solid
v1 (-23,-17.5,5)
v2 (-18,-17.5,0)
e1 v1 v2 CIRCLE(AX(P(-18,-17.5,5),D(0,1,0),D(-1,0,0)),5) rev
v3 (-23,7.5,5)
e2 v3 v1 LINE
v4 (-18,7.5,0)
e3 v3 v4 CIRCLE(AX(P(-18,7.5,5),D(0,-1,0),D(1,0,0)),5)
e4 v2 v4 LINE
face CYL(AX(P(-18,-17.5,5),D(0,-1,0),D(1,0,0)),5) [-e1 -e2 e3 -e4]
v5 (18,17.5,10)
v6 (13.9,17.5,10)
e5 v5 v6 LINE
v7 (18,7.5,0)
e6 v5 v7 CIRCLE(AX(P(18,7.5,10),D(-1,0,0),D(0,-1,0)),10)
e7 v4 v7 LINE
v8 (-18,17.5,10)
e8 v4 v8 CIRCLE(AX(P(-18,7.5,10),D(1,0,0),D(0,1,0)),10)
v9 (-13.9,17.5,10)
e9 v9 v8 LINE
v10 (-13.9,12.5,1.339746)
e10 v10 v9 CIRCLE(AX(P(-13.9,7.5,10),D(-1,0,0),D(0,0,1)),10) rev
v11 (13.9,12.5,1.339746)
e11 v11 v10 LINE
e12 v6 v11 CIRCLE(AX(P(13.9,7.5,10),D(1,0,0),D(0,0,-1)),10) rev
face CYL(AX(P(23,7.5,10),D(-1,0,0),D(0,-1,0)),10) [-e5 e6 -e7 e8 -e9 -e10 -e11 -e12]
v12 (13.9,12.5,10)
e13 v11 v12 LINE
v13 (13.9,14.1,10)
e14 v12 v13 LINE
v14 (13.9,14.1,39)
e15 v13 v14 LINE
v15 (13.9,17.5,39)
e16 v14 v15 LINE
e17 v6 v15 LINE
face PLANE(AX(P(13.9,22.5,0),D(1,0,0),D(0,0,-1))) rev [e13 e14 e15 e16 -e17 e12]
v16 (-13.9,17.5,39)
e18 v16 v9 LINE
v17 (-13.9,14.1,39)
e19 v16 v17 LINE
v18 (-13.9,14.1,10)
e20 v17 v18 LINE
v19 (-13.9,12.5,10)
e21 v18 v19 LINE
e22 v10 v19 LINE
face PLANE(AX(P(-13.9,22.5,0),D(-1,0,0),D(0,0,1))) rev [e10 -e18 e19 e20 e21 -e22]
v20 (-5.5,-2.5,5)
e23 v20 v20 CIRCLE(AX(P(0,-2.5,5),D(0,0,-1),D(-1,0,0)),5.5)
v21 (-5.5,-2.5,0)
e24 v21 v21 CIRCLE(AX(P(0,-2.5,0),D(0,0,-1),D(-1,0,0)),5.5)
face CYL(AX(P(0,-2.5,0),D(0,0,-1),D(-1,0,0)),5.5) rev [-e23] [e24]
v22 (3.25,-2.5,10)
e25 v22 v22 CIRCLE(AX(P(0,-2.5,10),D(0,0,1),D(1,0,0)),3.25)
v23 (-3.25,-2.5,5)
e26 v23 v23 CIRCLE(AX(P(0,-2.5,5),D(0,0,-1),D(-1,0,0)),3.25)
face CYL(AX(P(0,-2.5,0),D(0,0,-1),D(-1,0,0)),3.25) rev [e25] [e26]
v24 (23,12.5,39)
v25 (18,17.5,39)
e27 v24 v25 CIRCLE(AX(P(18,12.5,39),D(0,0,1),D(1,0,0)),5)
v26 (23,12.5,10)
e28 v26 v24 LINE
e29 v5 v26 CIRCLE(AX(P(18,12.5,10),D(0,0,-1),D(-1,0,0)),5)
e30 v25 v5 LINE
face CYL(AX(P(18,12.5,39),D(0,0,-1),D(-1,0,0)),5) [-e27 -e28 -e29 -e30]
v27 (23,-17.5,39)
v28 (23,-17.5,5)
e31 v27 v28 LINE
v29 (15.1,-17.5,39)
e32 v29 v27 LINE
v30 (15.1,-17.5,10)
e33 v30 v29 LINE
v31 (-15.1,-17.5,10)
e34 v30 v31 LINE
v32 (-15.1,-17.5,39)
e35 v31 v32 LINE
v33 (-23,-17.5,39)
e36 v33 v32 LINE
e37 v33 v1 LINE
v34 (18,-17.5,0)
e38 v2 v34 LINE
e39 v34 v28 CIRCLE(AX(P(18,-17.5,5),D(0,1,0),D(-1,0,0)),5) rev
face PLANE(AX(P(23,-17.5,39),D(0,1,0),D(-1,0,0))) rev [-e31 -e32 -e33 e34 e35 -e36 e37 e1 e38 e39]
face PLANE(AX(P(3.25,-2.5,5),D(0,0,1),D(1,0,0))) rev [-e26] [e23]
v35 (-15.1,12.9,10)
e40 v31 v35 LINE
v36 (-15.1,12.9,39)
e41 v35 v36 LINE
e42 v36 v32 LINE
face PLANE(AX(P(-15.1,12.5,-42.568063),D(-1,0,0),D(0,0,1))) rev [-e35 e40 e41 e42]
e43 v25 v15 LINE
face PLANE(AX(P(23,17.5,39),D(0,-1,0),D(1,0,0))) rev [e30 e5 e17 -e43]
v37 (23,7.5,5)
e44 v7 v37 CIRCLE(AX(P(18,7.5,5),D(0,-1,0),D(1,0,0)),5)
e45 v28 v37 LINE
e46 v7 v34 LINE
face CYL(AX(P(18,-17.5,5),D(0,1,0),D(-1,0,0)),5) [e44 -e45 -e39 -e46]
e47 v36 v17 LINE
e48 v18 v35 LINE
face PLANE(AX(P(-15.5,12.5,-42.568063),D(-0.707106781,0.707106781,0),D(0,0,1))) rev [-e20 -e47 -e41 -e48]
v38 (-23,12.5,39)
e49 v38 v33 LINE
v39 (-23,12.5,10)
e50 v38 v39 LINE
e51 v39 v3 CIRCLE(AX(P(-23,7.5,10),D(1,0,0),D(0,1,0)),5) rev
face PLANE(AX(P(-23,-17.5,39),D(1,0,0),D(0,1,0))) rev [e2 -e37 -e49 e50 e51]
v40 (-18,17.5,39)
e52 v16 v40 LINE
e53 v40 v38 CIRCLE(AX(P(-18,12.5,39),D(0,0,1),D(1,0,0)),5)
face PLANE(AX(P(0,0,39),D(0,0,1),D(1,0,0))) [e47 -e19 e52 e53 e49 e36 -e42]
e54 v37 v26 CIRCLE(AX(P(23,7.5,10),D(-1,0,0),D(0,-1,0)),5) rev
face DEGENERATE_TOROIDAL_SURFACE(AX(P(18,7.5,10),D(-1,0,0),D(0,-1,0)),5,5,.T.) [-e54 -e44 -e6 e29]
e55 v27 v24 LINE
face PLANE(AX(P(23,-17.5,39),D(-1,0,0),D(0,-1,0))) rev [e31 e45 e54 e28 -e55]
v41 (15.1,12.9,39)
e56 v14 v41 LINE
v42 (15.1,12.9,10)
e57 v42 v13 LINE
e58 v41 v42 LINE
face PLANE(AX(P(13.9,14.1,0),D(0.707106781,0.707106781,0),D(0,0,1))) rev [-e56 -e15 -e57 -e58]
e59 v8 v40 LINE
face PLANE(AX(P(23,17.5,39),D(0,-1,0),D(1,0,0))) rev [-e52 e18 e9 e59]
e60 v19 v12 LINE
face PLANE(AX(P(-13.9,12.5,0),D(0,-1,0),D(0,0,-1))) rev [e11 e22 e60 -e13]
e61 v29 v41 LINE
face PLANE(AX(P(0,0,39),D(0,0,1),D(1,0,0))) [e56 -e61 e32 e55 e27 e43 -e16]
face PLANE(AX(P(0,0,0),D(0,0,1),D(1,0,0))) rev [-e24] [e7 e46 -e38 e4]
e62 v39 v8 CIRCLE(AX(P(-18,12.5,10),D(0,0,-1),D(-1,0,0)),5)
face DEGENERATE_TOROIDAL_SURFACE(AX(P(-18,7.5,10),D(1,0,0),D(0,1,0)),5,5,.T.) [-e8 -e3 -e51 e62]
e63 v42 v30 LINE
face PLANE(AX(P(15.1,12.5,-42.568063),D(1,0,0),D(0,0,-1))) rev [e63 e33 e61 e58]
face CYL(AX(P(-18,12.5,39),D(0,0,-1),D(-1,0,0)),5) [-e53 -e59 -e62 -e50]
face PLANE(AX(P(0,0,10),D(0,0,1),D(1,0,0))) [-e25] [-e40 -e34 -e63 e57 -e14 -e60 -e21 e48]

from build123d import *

# Parameters (mm, degrees)
SKETCH_1_W                   = 46
SKETCH_1_H                   = 35
EXTRUDE_1_DEPTH              = 39
SKETCH_2_W                   = 30.2
SKETCH_2_H                   = 30
CUT_EXTRUDE_1_DEPTH          = 29
SKETCH_4_W                   = 27.8
SKETCH_4_H                   = 10
CUT_EXTRUDE_2_DEPTH          = 49.541219597
HOLE_WIZARD_M6_2_D           = 6.5
HOLE_WIZARD_M6_2_CBORE_D     = 11
HOLE_WIZARD_M6_2_CBORE_DEPTH = 5
CHAMFER_1_SIZE               = 1.6
FILLET_3_R                   = 10
FILLET_4_R                   = 5


with BuildPart() as part:
    # 草图1 → 凸台-拉伸1 (new body)
    with BuildSketch(Plane.XY):
        Rectangle(SKETCH_1_W, SKETCH_1_H)
    extrude(amount=EXTRUDE_1_DEPTH)

    # 草图2 → 切除-拉伸1 (cut)
    with BuildSketch(Plane.XY.offset(39)):
        with Locations((0, -2.5)):
            Rectangle(SKETCH_2_W, SKETCH_2_H)
    extrude(amount=-CUT_EXTRUDE_1_DEPTH, mode=Mode.SUBTRACT)

    # 草图4 → 切除-拉伸2 (cut, through all)
    with BuildSketch(Plane.XY.offset(39)):
        with Locations((0, 17.5)):
            Rectangle(SKETCH_4_W, SKETCH_4_H)
    extrude(amount=-CUT_EXTRUDE_2_DEPTH, mode=Mode.SUBTRACT)

    # M6 凹头盖螺钉的柱形沉头孔2 (through all)
    with Locations(Plane(origin=(0, 0, 0), x_dir=(-1, 0, 0), z_dir=(0, 0, -1))):
        with Locations((0, -2.5)):
            CounterBoreHole(HOLE_WIZARD_M6_2_D / 2, HOLE_WIZARD_M6_2_CBORE_D / 2, HOLE_WIZARD_M6_2_CBORE_DEPTH)

    # 倒角1
    # the kernel refuses this chamfer: 1.6 mm, written as the material it takes off along each edge
    with BuildSketch(Plane(origin=(13.9, 12.5, 43.114692781), x_dir=(-0.027495876610586285, 0.9996219169112968, 0), z_dir=(0, 0, -1))) as chamfer_1_piece_1_section:
        Polygon((CHAMFER_1_SIZE * 0.999621916911, CHAMFER_1_SIZE * 0.0274958766106), (-CHAMFER_1_SIZE * 0.0274958766106, CHAMFER_1_SIZE * 0.999621916911), (0, 0), align=None)
    chamfer_1_piece_1 = extrude(amount=33.114692781, mode=Mode.PRIVATE)
    chamfer_1_piece_1 = split(chamfer_1_piece_1, bisect_by=Plane(origin=(15.1, 13.06, 24.5), z_dir=(-1, 0, 0)), keep=Keep.TOP, mode=Mode.PRIVATE)
    add(chamfer_1_piece_1, mode=Mode.SUBTRACT)
    with BuildSketch(Plane(origin=(-13.9, 12.5, 43.114692781), x_dir=(0.027495876610586285, 0.9996219169112968, 0), z_dir=(0, 0, -1))) as chamfer_1_piece_2_section:
        Polygon((CHAMFER_1_SIZE * 0.999621916911, -CHAMFER_1_SIZE * 0.0274958766106), (-CHAMFER_1_SIZE * 0.0274958766106, -CHAMFER_1_SIZE * 0.999621916911), (0, 0), align=None)
    chamfer_1_piece_2 = extrude(amount=33.114692781, mode=Mode.PRIVATE)
    chamfer_1_piece_2 = split(chamfer_1_piece_2, bisect_by=Plane(origin=(-15.1, 13.06, 24.5), z_dir=(1, 0, 0)), keep=Keep.TOP, mode=Mode.PRIVATE)
    add(chamfer_1_piece_2, mode=Mode.SUBTRACT)

    # 圆角3
    fillet_3_edges = [part.edges().sort_by_distance(p)[0] for p in [
        (18.45, 17.5, 0),
    ]]
    fillet(fillet_3_edges, radius=FILLET_3_R)

    # 圆角4
    fillet_4_edges = [part.edges().sort_by_distance(p)[0] for p in [
        (23, -5, 0),
        (-23, 17.5, 24.499999812),
        (23, 17.5, 24.5),
        (-23, -5, 0),
        (-23, 14.571067679, 2.928932055),
        (23, 14.571067812, 2.928932188),
    ]]
    fillet(fillet_4_edges, radius=FILLET_4_R)


solid = part.part
